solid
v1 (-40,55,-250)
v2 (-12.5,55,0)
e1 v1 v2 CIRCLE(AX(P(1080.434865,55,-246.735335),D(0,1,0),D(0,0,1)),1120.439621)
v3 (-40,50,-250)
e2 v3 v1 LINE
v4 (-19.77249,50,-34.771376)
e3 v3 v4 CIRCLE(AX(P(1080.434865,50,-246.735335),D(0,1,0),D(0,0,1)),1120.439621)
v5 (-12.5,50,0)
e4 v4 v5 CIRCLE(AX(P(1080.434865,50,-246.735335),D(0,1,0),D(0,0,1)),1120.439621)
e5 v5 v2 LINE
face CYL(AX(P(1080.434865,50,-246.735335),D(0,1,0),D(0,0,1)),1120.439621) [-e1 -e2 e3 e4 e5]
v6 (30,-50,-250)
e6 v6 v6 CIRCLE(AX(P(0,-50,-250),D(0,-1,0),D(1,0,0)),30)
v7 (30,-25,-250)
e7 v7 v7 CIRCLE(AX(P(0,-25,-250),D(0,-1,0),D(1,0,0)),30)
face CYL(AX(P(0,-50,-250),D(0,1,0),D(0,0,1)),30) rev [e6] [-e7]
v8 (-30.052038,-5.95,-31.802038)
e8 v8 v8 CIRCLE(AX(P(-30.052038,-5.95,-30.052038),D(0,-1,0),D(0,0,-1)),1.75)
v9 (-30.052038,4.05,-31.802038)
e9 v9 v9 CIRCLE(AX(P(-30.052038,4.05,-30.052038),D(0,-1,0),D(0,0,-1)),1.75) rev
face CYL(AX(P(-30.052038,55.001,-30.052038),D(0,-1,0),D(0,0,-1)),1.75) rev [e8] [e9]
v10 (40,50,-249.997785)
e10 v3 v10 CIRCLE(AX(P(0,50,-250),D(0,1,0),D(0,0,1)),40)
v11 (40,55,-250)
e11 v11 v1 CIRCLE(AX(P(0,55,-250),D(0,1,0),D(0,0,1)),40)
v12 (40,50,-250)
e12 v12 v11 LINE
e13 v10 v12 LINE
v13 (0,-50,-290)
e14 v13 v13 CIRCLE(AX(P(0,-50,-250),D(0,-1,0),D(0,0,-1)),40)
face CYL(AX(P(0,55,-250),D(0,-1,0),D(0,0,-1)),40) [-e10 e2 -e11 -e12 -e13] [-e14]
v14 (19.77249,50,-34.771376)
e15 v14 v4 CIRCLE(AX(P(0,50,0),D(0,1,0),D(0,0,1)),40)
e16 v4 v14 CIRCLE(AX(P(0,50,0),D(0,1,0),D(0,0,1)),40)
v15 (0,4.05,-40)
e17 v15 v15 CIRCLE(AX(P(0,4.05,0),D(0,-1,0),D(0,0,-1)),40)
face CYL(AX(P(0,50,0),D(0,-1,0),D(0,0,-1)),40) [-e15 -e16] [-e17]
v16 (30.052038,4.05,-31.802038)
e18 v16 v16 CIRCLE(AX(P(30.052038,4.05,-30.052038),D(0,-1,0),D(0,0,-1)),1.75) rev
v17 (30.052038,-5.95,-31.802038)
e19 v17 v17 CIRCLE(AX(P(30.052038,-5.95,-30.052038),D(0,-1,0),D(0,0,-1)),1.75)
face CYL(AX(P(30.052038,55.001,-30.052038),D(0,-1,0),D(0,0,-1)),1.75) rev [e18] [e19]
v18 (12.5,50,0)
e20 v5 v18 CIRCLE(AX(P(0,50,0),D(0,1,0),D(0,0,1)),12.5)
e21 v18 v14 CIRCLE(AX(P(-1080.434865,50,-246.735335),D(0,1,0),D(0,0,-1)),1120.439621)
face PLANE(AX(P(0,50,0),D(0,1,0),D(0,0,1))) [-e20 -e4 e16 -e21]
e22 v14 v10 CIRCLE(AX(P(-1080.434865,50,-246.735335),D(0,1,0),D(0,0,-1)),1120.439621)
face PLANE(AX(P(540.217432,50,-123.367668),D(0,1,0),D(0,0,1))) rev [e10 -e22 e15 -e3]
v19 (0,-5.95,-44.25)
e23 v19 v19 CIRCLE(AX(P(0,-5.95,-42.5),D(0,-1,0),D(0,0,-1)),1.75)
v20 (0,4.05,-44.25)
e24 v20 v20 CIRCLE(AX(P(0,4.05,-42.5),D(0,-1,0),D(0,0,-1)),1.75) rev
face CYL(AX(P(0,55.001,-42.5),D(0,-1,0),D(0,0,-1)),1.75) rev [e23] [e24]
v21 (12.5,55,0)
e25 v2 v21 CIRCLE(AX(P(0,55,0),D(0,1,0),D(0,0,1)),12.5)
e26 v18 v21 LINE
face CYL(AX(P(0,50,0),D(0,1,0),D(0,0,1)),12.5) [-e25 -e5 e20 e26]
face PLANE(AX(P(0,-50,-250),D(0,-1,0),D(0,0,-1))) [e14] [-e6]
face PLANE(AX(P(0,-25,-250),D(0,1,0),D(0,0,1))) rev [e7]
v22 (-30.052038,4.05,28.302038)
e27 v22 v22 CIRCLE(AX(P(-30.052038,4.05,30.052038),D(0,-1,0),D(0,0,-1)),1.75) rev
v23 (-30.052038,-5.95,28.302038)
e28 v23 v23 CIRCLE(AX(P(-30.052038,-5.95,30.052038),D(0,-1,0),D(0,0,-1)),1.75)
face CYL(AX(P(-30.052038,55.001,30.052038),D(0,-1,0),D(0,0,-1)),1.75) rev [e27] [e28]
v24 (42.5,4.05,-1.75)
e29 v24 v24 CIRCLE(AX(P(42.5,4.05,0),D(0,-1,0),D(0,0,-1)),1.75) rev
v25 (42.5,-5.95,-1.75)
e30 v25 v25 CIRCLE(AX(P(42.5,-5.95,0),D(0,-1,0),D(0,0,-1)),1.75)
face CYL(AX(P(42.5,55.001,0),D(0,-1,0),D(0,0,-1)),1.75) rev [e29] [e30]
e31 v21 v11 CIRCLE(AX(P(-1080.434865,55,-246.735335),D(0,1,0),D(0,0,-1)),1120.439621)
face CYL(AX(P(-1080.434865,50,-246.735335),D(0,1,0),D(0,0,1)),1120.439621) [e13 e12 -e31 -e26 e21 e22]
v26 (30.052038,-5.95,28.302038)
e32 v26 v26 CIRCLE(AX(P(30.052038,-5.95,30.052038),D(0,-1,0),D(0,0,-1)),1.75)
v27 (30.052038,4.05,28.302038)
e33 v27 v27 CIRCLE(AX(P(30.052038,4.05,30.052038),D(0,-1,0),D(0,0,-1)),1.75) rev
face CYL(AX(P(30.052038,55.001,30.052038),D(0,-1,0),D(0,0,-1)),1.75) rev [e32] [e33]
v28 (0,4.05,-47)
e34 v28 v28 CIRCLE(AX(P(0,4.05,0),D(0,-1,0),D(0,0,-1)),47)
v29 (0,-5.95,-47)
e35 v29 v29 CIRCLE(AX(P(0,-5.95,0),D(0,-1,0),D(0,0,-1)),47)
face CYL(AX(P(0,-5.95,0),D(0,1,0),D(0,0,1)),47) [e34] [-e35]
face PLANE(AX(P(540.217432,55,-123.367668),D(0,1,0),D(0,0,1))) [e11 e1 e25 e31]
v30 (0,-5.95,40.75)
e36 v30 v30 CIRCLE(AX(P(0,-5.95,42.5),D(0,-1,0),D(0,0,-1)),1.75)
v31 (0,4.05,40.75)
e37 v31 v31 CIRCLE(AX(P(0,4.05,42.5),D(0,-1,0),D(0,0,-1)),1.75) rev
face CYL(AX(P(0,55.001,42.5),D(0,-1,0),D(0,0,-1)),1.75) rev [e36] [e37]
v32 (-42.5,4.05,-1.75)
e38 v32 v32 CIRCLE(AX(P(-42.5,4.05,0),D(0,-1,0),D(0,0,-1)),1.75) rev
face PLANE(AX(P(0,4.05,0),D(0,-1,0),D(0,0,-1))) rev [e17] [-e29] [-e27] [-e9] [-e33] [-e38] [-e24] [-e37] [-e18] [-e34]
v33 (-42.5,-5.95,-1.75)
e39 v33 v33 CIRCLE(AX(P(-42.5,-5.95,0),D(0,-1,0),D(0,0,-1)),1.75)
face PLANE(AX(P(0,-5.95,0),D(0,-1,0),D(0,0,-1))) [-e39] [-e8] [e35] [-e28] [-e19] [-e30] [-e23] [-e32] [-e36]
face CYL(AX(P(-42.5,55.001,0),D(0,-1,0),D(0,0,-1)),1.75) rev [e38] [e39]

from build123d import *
from build123d.topology import SkipClean

# Parameters (mm, degrees)
SKETCH_1_R          = 40
EXTRUDE_1_DEPTH     = 50
EXTRUDE_1_2_DEPTH   = 50
EXTRUDE_START       = 5
EXTRUDE_2_DEPTH     = 5
EXTRUDE_3_DEPTH     = 5
EXTRUDE_START_2     = -5
SKETCH_5_R          = 40
EXTRUDE_4_DEPTH     = 5
SKETCH_7_R          = 2
SKETCH_7_R_2        = 4
CUT_EXTRUDE_2_DEPTH = 10
CUT_EXTRUDE_START   = -59.05
SKETCH_9_R          = 40
CUT_EXTRUDE_4_DEPTH = 54.05
SKETCH_10_R         = 47
EXTRUDE_5_DEPTH     = 10
CUT_EXTRUDE_5_REACH = 302.04
SKETCH_11_R         = 1.75
CUT_EXTRUDE_START_2 = -80
SKETCH_12_R         = 39.999999969
CUT_EXTRUDE_6_DEPTH = 20
SKETCH_14_R         = 40
EXTRUDE_6_DEPTH     = 5
CUT_EXTRUDE_8_DEPTH = 10
CUT_EXTRUDE_9_DEPTH = 5
EXTRUDE_8_DEPTH     = 5
SKETCH_13_R         = 39.999999969
SKETCH_13_R_2       = 29.999999969
EXTRUDE_1_3_DEPTH   = 25


with BuildPart() as part:
    # 草图1 → Extrude 1 (new, symmetric)
    with BuildSketch(Plane(origin=(0, 0, 0), x_dir=(1, 0, 0), z_dir=(0, 1, 0))):
        Circle(SKETCH_1_R)
    extrude(amount=EXTRUDE_1_DEPTH, both=True)



with BuildPart() as body_2:
    # 草图1 → Extrude 1 2 (new, symmetric)
    with BuildSketch(Plane(origin=(0, 0, 0), x_dir=(1, 0, 0), z_dir=(0, 1, 0))):
        with Locations((0, 250)):
            Circle(SKETCH_1_R)
    extrude(amount=EXTRUDE_1_2_DEPTH, both=True)


with BuildPart() as part_1:
    add(part.part)

    add(body_2.part)  # 凸台-拉伸2 merges body 2
    # 草图2 → 凸台-拉伸2 (add)
    with BuildSketch(Plane(origin=(0, 50, 0), x_dir=(1, 0, 0), z_dir=(0, 1, 0)).offset(EXTRUDE_START)):
        with BuildLine():
            Line((39.986095464, -1.054594484), (40, 250))
            ThreePointArc((40, 250), (0, 290), (-40, 250))
            Line((-40, 250), (-40, 0))
            ThreePointArc((-40, 0), (-0.527343072, -39.996523715), (39.986095464, -1.054594484))
        make_face()
    extrude(amount=-EXTRUDE_2_DEPTH)

    # 草图3 → 凸台-拉伸3 (add)
    with SkipClean():  # the faces are left unmerged after this step: merging them gives an invalid solid
        with BuildSketch(Plane(origin=(0, -50, 0), x_dir=(-1, 0, 0), z_dir=(0, -1, 0))):
            with BuildLine():
                Line((40, 0), (40, 250))
                ThreePointArc((40, 250), (0, 290), (-40, 250))
                Line((-40, 250), (-40, 0))
                ThreePointArc((-40, 0), (0, -40), (40, 0))
            make_face()
        extrude(amount=EXTRUDE_3_DEPTH)

    # 草图5 → 凸台-拉伸4 (add)
    with SkipClean():  # the faces are left unmerged after this step: merging them gives an invalid solid
        with BuildSketch(Plane.XZ.offset(55).offset(EXTRUDE_START_2)):
            Circle(SKETCH_5_R)
        extrude(amount=EXTRUDE_4_DEPTH)

    # 草图7 → 切除-拉伸2 (cut)
    with SkipClean():  # the faces are left unmerged after this step: merging them gives an invalid solid
        with BuildSketch(Plane.XZ.offset(55)):
            with Locations((17.25, -250)):
                Circle(SKETCH_7_R)
            with Locations((8.625, -264.938938215)):
                Circle(SKETCH_7_R)
            with Locations((-8.625, -264.938938215)):
                Circle(SKETCH_7_R)
            with Locations((-17.25, -250)):
                Circle(SKETCH_7_R)
            with Locations((-8.625, -235.061061785)):
                Circle(SKETCH_7_R)
            with Locations((8.625, -235.061061785)):
                Circle(SKETCH_7_R)
            with Locations((0, -250)):
                Circle(SKETCH_7_R_2)
        extrude(amount=-CUT_EXTRUDE_2_DEPTH, mode=Mode.SUBTRACT)

    # 草图9 → 切除-拉伸4 (cut)
    with SkipClean():  # the faces are left unmerged after this step: merging them gives an invalid solid
        with BuildSketch(Plane.XZ.offset(55).offset(CUT_EXTRUDE_START)):
            Circle(SKETCH_9_R)
        extrude(amount=CUT_EXTRUDE_4_DEPTH, mode=Mode.SUBTRACT)

    # 草图10 → 凸台-拉伸5 (add)
    with SkipClean():  # the faces are left unmerged after this step: merging them gives an invalid solid
        with BuildSketch(Plane.XZ.offset(-4.05)):
            Circle(SKETCH_10_R)
        extrude(amount=EXTRUDE_5_DEPTH)

    # 草图11 → 切除-拉伸5 (cut, up to next)
    with BuildSketch(Plane.XZ.offset(5.95), mode=Mode.PRIVATE) as cut_extrude_5_sk1:
        with Locations((42.5, 0)):
            Circle(SKETCH_11_R)
    cut_extrude_5_tool1 = extrude(cut_extrude_5_sk1.sketch, amount=-CUT_EXTRUDE_5_REACH, mode=Mode.PRIVATE) & part_1.part
    # 草图11 → 切除-拉伸5 (cut, up to next)
    with BuildSketch(Plane.XZ.offset(5.95), mode=Mode.PRIVATE) as cut_extrude_5_sk2:
        with Locations((30.0520382, -30.0520382)):
            Circle(SKETCH_11_R)
    cut_extrude_5_tool2 = extrude(cut_extrude_5_sk2.sketch, amount=-CUT_EXTRUDE_5_REACH, mode=Mode.PRIVATE) & part_1.part
    # 草图11 → 切除-拉伸5 (cut, up to next)
    with BuildSketch(Plane.XZ.offset(5.95), mode=Mode.PRIVATE) as cut_extrude_5_sk3:
        with Locations((0, -42.5)):
            Circle(SKETCH_11_R)
    cut_extrude_5_tool3 = extrude(cut_extrude_5_sk3.sketch, amount=-CUT_EXTRUDE_5_REACH, mode=Mode.PRIVATE) & part_1.part
    # 草图11 → 切除-拉伸5 (cut, up to next)
    with BuildSketch(Plane.XZ.offset(5.95), mode=Mode.PRIVATE) as cut_extrude_5_sk4:
        with Locations((-30.0520382, -30.0520382)):
            Circle(SKETCH_11_R)
    cut_extrude_5_tool4 = extrude(cut_extrude_5_sk4.sketch, amount=-CUT_EXTRUDE_5_REACH, mode=Mode.PRIVATE) & part_1.part
    # 草图11 → 切除-拉伸5 (cut, up to next)
    with BuildSketch(Plane.XZ.offset(5.95), mode=Mode.PRIVATE) as cut_extrude_5_sk5:
        with Locations((-42.5, 0)):
            Circle(SKETCH_11_R)
    cut_extrude_5_tool5 = extrude(cut_extrude_5_sk5.sketch, amount=-CUT_EXTRUDE_5_REACH, mode=Mode.PRIVATE) & part_1.part
    # 草图11 → 切除-拉伸5 (cut, up to next)
    with BuildSketch(Plane.XZ.offset(5.95), mode=Mode.PRIVATE) as cut_extrude_5_sk6:
        with Locations((-30.0520382, 30.0520382)):
            Circle(SKETCH_11_R)
    cut_extrude_5_tool6 = extrude(cut_extrude_5_sk6.sketch, amount=-CUT_EXTRUDE_5_REACH, mode=Mode.PRIVATE) & part_1.part
    # 草图11 → 切除-拉伸5 (cut, up to next)
    with BuildSketch(Plane.XZ.offset(5.95), mode=Mode.PRIVATE) as cut_extrude_5_sk7:
        with Locations((0, 42.5)):
            Circle(SKETCH_11_R)
    cut_extrude_5_tool7 = extrude(cut_extrude_5_sk7.sketch, amount=-CUT_EXTRUDE_5_REACH, mode=Mode.PRIVATE) & part_1.part
    # 草图11 → 切除-拉伸5 (cut, up to next)
    with BuildSketch(Plane.XZ.offset(5.95), mode=Mode.PRIVATE) as cut_extrude_5_sk8:
        with Locations((30.0520382, 30.0520382)):
            Circle(SKETCH_11_R)
    cut_extrude_5_tool8 = extrude(cut_extrude_5_sk8.sketch, amount=-CUT_EXTRUDE_5_REACH, mode=Mode.PRIVATE) & part_1.part
    add(cut_extrude_5_tool1.solids().sort_by_distance((42.5, -5.95, 0))[0], mode=Mode.SUBTRACT)
    add(cut_extrude_5_tool2.solids().sort_by_distance((30.052038, -5.95, -30.052038))[0], mode=Mode.SUBTRACT)
    add(cut_extrude_5_tool3.solids().sort_by_distance((0, -5.95, -42.5))[0], mode=Mode.SUBTRACT)
    add(cut_extrude_5_tool4.solids().sort_by_distance((-30.052038, -5.95, -30.052038))[0], mode=Mode.SUBTRACT)
    add(cut_extrude_5_tool5.solids().sort_by_distance((-42.5, -5.95, 0))[0], mode=Mode.SUBTRACT)
    add(cut_extrude_5_tool6.solids().sort_by_distance((-30.052038, -5.95, 30.052038))[0], mode=Mode.SUBTRACT)
    add(cut_extrude_5_tool7.solids().sort_by_distance((0, -5.95, 42.5))[0], mode=Mode.SUBTRACT)
    add(cut_extrude_5_tool8.solids().sort_by_distance((30.052038, -5.95, 30.052038))[0], mode=Mode.SUBTRACT)

    # 草图12 → 切除-拉伸6 (cut)
    with SkipClean():  # the faces are left unmerged after this step: merging them gives an invalid solid
        with BuildSketch(Plane(origin=(0, 55, 0), x_dir=(1, 0, 0), z_dir=(0, 1, 0)).offset(CUT_EXTRUDE_START_2)):
            with Locations((0, 250)):
                Circle(SKETCH_12_R)
        extrude(amount=-CUT_EXTRUDE_6_DEPTH, mode=Mode.SUBTRACT)


with BuildPart() as cut_extrude_6_piece_1:
    # of the separate pieces the step leaves, piece 1, a body of its own (cut_extrude_6_pieces)
    add(part_1.part.solids().sort_by_distance((47, 4.05, 0))[0])

    # 草图14 → 凸台-拉伸6 (add)
    with BuildSketch(Plane.XZ.offset(-50)):
        with Locations((0, -250)):
            Circle(SKETCH_14_R)
    extrude(amount=-EXTRUDE_6_DEPTH)

    # 草图17 → 切除-拉伸9 (cut)
    with BuildSketch(Plane(origin=(0, 55, 0), x_dir=(1, 0, 0), z_dir=(0, 1, 0))):
        with BuildLine():
            Line((-40, 0), (-40, 250))
            ThreePointArc((-40, 250), (0, 290), (40, 250))
            Line((40, 250), (40, 0))
            ThreePointArc((40, 0), (0, -40), (-40, 0))
        make_face()
    extrude(amount=-CUT_EXTRUDE_9_DEPTH, mode=Mode.SUBTRACT)


with BuildPart() as cut_extrude_6_piece_2:
    # of the separate pieces the step leaves, piece 2, a body of its own (cut_extrude_6_pieces)
    add(part_1.part.solids().sort_by_distance((39.999999969, -45, -250))[0])

    # 草图15 → 切除-拉伸8 (cut)
    with BuildSketch(Plane.XZ.offset(55)):
        with BuildLine():
            Line((40, 0), (40, -250))
            ThreePointArc((40, -250), (0, -290), (-40, -250))
            Line((-40, -250), (-40, 0))
            ThreePointArc((-40, 0), (0, 40), (40, 0))
        make_face()
    extrude(amount=-CUT_EXTRUDE_8_DEPTH, mode=Mode.SUBTRACT)


with BuildPart() as cut_extrude_9_piece_1:
    # of the separate pieces the step leaves, piece 1, a body of its own (cut_extrude_9_pieces)
    add(cut_extrude_6_piece_1.part.solids().sort_by_distance((40, 50, -250))[0])



with BuildPart() as cut_extrude_9_piece_2:
    # of the separate pieces the step leaves, piece 2, a body of its own (cut_extrude_9_pieces)
    add(cut_extrude_6_piece_1.part.solids().sort_by_distance((47, 4.05, 0))[0])


with BuildPart() as cut_extrude_9_piece_1_1:
    add(cut_extrude_9_piece_1.part)

    add(cut_extrude_9_piece_2.part)  # 凸台-拉伸8 merges 切除-拉伸9 piece 2
    # 草图18 → 凸台-拉伸8 (add)
    with BuildSketch(Plane(origin=(0, 55, 0), x_dir=(1, 0, 0), z_dir=(0, 1, 0))):
        with BuildLine():
            ThreePointArc((40.000000061, 250), (0, 290.000000061), (-40.000000061, 250))
            ThreePointArc((-40.000000061, 250), (-33.286999063, 124.225930105), (-12.5, 0))
            ThreePointArc((-12.5, 0), (0, -12.5), (12.5, 0))
            ThreePointArc((12.5, 0), (33.286999063, 124.225930105), (40.000000061, 250))
        make_face()
    extrude(amount=-EXTRUDE_8_DEPTH)

    # 草图13 → Extrude 1 3 (add)
    with BuildSketch(Plane.XZ.offset(25)):
        with Locations((0, -250)):
            Circle(SKETCH_13_R)
        with Locations((0, -250)):
            Circle(SKETCH_13_R_2, mode=Mode.SUBTRACT)
    extrude(amount=EXTRUDE_1_3_DEPTH)


solid = cut_extrude_9_piece_1_1.part
